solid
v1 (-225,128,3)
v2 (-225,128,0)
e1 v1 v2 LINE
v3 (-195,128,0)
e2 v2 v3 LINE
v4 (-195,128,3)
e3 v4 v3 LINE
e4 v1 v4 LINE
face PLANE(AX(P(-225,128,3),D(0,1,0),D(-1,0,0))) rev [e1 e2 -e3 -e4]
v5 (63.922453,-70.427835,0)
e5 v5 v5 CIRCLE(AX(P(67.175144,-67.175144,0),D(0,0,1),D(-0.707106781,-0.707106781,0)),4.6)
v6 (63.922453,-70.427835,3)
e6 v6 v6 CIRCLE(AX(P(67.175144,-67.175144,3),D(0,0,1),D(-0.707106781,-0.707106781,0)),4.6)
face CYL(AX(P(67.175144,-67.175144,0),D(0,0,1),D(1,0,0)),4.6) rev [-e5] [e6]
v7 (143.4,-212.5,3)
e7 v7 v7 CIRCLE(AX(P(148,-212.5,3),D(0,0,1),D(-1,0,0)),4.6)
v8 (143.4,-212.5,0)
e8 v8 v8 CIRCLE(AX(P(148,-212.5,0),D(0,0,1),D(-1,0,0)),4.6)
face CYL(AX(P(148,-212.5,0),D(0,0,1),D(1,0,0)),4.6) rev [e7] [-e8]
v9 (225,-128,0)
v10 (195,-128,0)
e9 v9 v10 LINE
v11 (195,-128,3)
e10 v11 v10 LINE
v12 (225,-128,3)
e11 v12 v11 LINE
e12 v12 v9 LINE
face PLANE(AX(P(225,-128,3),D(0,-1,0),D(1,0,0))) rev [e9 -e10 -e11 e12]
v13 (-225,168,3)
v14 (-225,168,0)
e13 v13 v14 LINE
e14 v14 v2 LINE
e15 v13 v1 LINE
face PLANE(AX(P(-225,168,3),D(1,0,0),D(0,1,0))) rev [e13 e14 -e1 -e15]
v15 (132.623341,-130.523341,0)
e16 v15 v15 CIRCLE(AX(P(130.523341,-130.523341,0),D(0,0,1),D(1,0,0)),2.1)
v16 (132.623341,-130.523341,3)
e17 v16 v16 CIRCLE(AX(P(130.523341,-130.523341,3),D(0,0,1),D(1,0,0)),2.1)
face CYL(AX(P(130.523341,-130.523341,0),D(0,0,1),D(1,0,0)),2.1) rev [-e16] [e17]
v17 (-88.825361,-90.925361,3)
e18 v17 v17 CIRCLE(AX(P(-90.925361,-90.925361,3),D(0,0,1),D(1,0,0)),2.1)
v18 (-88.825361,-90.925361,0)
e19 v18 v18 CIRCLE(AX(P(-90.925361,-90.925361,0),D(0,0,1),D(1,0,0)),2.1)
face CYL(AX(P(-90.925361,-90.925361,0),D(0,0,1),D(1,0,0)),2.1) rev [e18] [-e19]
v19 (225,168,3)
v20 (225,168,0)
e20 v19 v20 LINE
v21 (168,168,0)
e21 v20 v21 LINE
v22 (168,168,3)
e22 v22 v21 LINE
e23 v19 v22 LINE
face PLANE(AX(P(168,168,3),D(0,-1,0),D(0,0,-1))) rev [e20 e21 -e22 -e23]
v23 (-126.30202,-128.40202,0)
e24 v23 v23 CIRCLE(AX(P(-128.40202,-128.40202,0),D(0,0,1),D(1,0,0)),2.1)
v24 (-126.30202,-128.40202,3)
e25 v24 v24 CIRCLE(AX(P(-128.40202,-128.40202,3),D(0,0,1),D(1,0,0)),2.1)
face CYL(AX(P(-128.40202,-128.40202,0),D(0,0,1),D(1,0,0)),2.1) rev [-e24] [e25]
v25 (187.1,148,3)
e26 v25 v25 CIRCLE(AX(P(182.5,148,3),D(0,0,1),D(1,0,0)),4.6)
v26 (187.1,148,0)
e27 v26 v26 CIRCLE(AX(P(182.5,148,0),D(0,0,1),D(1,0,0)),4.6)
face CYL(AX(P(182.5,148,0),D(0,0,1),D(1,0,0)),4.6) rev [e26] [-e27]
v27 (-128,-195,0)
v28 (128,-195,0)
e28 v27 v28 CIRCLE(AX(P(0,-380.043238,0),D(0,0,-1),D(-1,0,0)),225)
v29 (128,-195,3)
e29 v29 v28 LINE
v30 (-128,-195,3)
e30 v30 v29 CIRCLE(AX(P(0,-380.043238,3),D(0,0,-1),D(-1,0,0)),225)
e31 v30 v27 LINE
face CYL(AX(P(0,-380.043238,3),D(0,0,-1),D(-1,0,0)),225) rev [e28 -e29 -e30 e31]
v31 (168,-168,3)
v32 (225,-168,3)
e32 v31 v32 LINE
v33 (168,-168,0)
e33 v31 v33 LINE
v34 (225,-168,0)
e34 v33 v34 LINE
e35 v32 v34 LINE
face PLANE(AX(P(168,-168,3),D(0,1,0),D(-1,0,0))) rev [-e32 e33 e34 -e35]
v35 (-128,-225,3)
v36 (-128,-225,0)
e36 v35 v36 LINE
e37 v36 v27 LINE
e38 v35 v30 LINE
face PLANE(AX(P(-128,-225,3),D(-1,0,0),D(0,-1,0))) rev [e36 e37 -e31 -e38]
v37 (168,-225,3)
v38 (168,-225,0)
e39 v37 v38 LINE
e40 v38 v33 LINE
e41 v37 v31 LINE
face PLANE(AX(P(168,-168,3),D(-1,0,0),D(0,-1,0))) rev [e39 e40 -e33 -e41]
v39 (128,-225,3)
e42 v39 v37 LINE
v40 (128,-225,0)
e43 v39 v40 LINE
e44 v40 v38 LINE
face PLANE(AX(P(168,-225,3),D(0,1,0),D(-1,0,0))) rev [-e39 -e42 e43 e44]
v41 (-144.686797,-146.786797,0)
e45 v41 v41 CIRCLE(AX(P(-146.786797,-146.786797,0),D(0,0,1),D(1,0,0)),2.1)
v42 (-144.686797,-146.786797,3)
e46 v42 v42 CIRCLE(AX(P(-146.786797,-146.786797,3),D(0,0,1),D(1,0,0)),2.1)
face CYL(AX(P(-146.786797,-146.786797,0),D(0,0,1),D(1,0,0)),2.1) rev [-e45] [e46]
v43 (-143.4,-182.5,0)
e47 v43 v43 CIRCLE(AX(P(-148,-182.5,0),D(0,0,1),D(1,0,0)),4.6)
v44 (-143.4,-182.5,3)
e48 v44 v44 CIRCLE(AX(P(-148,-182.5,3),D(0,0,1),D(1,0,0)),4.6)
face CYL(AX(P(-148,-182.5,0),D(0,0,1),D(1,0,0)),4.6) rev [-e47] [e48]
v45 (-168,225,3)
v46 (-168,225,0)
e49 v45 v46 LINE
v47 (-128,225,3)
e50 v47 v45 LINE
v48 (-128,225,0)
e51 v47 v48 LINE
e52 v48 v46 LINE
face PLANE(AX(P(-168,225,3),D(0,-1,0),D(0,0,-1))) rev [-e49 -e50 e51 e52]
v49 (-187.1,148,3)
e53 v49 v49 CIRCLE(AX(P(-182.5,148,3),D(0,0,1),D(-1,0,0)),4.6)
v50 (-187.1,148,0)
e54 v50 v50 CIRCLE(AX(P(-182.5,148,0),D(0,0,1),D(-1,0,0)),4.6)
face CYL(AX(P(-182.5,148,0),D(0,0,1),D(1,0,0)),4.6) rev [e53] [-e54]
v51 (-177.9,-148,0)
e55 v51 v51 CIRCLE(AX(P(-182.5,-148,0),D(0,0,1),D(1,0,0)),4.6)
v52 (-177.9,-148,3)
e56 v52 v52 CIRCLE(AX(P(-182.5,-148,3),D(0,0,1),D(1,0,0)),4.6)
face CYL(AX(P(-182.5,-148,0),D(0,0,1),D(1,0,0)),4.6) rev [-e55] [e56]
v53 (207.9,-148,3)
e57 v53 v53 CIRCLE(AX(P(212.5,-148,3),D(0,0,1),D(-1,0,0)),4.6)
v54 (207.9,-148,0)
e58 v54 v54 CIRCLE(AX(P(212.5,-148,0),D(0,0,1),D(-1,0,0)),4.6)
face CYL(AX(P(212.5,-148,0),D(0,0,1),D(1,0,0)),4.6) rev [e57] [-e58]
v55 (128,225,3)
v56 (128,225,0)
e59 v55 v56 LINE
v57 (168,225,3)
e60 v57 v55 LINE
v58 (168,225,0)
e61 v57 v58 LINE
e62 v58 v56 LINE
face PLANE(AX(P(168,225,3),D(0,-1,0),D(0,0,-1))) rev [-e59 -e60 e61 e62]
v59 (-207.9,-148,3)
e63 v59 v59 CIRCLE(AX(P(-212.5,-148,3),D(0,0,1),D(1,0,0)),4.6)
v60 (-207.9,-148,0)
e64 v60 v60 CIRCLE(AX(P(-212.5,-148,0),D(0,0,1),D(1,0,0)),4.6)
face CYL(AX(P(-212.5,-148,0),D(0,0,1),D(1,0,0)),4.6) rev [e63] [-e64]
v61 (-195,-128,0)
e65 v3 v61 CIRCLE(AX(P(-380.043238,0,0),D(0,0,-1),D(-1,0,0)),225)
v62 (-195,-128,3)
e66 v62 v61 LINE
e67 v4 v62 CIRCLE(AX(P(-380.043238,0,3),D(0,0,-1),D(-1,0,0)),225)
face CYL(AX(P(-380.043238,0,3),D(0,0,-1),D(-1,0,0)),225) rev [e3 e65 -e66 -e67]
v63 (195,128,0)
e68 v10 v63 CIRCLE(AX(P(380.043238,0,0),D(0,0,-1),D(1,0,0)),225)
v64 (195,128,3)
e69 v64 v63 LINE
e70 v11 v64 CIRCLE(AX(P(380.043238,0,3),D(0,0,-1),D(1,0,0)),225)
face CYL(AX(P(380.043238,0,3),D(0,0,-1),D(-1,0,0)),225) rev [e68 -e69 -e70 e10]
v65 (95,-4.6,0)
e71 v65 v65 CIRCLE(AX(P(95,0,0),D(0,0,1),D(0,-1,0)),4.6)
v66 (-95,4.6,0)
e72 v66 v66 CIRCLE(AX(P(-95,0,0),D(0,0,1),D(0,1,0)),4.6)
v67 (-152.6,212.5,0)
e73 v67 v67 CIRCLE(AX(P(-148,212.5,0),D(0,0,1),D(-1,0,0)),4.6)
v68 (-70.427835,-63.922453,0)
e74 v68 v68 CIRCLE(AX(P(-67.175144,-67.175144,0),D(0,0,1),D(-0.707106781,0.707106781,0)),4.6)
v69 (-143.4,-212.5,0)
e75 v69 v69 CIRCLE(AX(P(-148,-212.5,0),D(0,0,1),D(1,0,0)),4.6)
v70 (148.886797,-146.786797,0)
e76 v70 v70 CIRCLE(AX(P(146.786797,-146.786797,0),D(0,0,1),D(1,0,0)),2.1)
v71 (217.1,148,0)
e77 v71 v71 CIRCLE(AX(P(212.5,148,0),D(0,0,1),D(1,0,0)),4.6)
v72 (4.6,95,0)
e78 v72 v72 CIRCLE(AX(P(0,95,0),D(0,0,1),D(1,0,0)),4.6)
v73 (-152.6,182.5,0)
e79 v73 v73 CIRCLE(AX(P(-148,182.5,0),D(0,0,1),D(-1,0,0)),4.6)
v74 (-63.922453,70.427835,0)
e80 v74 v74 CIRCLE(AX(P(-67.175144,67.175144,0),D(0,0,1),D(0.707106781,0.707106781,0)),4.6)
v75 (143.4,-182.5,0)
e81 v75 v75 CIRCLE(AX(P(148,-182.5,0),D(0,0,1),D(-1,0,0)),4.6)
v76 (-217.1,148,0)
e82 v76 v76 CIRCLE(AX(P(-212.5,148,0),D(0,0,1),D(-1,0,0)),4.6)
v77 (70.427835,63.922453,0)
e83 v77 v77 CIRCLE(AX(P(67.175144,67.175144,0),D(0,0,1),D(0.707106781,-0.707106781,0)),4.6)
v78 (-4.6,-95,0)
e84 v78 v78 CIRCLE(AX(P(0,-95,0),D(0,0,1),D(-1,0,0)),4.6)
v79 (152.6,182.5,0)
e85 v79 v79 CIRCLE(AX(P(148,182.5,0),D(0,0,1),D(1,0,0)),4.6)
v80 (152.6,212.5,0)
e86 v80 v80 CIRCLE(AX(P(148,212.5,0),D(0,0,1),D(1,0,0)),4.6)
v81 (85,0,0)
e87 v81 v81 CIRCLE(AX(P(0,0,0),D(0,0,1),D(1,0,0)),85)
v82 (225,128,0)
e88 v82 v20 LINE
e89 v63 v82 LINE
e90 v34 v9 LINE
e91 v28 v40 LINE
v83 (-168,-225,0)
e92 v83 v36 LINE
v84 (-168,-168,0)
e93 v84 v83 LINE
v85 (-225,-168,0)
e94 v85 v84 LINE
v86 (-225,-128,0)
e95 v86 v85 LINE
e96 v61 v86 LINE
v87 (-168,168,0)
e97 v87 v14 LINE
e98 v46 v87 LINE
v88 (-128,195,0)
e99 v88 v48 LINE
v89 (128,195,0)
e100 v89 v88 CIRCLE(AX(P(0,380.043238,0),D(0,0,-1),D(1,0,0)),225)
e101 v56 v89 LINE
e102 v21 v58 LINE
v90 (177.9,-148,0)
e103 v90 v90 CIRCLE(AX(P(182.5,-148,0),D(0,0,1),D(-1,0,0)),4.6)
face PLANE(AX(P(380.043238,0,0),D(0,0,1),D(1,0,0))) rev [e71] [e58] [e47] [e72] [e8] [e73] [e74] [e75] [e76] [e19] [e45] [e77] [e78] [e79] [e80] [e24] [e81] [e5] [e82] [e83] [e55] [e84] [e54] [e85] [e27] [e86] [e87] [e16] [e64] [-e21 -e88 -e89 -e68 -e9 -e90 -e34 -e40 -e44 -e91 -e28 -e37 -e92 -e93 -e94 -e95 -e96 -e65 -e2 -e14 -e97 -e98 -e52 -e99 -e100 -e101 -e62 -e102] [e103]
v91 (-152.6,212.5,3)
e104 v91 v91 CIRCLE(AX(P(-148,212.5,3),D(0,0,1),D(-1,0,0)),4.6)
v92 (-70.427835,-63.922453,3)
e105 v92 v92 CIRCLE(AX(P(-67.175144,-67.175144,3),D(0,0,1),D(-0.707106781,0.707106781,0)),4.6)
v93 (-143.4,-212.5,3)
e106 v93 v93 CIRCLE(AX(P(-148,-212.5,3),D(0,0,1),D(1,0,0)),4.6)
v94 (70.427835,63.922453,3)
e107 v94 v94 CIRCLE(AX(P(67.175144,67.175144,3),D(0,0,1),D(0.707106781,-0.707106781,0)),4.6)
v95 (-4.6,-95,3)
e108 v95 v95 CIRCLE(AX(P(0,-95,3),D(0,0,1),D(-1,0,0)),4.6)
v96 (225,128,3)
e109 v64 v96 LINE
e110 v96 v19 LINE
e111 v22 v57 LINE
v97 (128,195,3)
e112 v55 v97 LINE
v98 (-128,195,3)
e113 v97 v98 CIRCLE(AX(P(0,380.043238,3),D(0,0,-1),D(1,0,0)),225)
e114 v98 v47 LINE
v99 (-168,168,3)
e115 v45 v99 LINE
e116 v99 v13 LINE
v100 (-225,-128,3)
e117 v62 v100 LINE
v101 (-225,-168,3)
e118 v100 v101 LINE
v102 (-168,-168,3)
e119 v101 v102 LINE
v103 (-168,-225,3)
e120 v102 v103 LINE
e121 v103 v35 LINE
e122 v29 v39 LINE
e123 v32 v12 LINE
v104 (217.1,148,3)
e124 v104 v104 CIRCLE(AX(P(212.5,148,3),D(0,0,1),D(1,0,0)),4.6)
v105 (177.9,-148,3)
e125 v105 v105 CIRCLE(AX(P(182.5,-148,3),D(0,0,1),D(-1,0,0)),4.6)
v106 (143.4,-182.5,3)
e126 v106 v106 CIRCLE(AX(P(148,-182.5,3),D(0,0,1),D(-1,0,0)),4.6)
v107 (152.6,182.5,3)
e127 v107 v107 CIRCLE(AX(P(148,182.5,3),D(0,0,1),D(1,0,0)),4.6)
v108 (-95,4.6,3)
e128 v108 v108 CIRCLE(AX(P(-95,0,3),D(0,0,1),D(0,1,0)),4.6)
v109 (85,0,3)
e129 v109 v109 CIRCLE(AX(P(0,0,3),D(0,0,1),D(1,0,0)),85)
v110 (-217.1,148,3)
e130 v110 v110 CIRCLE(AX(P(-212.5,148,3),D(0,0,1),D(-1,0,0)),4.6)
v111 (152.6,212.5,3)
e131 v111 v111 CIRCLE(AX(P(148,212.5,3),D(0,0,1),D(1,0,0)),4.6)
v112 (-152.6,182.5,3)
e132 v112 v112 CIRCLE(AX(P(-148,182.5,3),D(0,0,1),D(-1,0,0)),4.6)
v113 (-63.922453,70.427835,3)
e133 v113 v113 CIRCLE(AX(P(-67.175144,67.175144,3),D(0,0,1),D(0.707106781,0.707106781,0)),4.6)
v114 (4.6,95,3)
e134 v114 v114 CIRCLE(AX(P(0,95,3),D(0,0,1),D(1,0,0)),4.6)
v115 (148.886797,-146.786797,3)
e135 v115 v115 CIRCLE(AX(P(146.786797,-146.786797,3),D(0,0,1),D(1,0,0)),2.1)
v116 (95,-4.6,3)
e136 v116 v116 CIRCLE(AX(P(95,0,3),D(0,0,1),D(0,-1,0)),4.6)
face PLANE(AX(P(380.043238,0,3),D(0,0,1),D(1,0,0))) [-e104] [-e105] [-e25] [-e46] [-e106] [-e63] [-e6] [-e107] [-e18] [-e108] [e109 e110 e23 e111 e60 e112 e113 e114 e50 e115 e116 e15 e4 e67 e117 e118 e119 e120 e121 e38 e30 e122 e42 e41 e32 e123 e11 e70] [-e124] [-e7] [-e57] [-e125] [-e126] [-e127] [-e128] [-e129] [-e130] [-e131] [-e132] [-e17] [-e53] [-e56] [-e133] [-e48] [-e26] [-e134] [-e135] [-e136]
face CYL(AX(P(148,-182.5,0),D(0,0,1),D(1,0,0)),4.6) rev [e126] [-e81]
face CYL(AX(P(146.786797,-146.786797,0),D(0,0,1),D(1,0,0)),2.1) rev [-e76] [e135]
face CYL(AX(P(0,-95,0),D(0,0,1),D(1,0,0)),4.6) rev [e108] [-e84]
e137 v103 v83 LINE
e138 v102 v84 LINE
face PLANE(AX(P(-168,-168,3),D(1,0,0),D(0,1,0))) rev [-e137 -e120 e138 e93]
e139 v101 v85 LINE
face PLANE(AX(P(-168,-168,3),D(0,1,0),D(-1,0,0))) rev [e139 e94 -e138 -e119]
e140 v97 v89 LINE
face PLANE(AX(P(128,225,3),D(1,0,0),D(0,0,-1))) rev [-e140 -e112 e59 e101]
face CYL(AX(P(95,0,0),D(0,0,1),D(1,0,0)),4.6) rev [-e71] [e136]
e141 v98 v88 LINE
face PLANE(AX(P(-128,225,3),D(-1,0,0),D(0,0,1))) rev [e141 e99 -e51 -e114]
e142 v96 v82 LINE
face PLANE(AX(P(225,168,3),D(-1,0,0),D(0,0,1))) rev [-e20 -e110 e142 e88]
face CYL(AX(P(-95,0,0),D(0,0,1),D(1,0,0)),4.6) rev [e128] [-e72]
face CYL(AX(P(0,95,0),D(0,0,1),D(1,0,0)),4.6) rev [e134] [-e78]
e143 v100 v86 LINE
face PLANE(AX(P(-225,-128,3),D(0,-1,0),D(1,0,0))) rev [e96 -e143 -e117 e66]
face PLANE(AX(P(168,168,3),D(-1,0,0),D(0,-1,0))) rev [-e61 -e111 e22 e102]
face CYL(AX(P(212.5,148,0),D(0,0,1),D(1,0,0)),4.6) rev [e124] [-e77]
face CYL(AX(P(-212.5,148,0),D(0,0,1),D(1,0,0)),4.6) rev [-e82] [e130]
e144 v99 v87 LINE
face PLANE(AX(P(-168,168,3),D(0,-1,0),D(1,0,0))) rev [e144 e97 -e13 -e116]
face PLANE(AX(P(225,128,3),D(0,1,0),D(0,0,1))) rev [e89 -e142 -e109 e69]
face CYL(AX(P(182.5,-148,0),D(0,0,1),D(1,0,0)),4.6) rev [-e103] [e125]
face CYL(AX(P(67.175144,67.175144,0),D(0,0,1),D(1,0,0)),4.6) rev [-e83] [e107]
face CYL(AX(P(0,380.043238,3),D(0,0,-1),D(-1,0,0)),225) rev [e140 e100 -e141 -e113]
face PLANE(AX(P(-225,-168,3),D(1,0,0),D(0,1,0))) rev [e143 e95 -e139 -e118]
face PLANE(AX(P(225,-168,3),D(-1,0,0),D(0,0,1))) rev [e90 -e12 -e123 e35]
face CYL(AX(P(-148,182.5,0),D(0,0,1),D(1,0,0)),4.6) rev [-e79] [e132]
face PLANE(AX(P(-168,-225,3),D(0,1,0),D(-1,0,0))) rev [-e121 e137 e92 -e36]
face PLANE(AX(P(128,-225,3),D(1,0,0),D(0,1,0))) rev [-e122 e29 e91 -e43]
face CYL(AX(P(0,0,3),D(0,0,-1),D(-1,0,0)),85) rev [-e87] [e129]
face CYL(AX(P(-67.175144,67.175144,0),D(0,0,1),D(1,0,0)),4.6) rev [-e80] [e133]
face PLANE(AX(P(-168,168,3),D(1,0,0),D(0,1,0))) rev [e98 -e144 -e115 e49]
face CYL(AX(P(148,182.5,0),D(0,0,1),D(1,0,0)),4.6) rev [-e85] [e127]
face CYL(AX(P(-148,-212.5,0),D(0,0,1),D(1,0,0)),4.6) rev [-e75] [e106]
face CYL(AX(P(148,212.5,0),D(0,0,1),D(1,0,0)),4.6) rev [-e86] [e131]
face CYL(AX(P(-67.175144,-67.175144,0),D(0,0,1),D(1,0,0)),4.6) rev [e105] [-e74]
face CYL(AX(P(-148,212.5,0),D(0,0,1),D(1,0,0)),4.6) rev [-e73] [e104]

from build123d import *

# Parameters (mm, degrees)
SKETCH1_R          = 85
BASE_FLANGE1_DEPTH = 3
SKETCH2_R          = 4.6
EXTRUDE1_DEPTH     = 3
SKETCH3_R          = 4.6
EXTRUDE2_DEPTH     = 3
CIRPATTERN1_COUNT  = 8
SKETCH4_R          = 2.1
CUT_EXTRUDE1_DEPTH = 10


# Sheet-metal steps are written as plain solids
with BuildPart() as part:
    # Sketch1 → Base-Flange1 (new body)
    with BuildSketch(Plane.XY):
        with BuildLine():
            Line((168, 168), (168, 225))
            Line((168, 225), (128, 225))
            Line((128, 225), (128, 195))
            ThreePointArc((128, 195), (0, 155.04323819), (-128, 195))
            Line((-128, 195), (-128, 225))
            Line((-128, 225), (-168, 225))
            Line((-168, 225), (-168, 168))
            Line((-168, 168), (-225, 168))
            Line((-225, 168), (-225, 128))
            Line((-225, 128), (-195, 128))
            ThreePointArc((-195, 128), (-155.04323819, 0), (-195, -128))
            Line((-195, -128), (-225, -128))
            Line((-225, -128), (-225, -168))
            Line((-225, -168), (-168, -168))
            Line((-168, -168), (-168, -225))
            Line((-168, -225), (-128, -225))
            Line((-128, -225), (-128, -195))
            ThreePointArc((-128, -195), (0, -155.04323819), (128, -195))
            Line((128, -195), (128, -225))
            Line((128, -225), (168, -225))
            Line((168, -225), (168, -168))
            Line((168, -168), (225, -168))
            Line((225, -168), (225, -128))
            Line((225, -128), (195, -128))
            ThreePointArc((195, -128), (155.04323819, 0), (195, 128))
            Line((195, 128), (225, 128))
            Line((225, 128), (225, 168))
            Line((225, 168), (168, 168))
        make_face()
        Circle(SKETCH1_R, mode=Mode.SUBTRACT)
    extrude(amount=BASE_FLANGE1_DEPTH)

    # Sketch2 → Extrude1 (cut)
    with BuildSketch(Plane.XY.offset(3)):
        with Locations((148, 212.5)):
            Circle(SKETCH2_R)
        with Locations((148, 182.5)):
            Circle(SKETCH2_R)
        with Locations((182.5, 148)):
            Circle(SKETCH2_R)
        with Locations((212.5, 148)):
            Circle(SKETCH2_R)
        with Locations(Location((212.5, -148, 0), (0, 0, 180))):
            Circle(SKETCH2_R)
        with Locations(Location((182.5, -148, 0), (0, 0, 180))):
            Circle(SKETCH2_R)
        with Locations(Location((148, -182.5, 0), (0, 0, 180))):
            Circle(SKETCH2_R)
        with Locations(Location((148, -212.5, 0), (0, 0, 180))):
            Circle(SKETCH2_R)
        with Locations((-148, -212.5)):
            Circle(SKETCH2_R)
        with Locations((-148, -182.5)):
            Circle(SKETCH2_R)
        with Locations((-182.5, -148)):
            Circle(SKETCH2_R)
        with Locations((-212.5, -148)):
            Circle(SKETCH2_R)
        with Locations(Location((-212.5, 148, 0), (0, 0, 180))):
            Circle(SKETCH2_R)
        with Locations(Location((-182.5, 148, 0), (0, 0, 180))):
            Circle(SKETCH2_R)
        with Locations(Location((-148, 182.5, 0), (0, 0, 180))):
            Circle(SKETCH2_R)
        with Locations(Location((-148, 212.5, 0), (0, 0, 180))):
            Circle(SKETCH2_R)
    extrude(amount=-EXTRUDE1_DEPTH, mode=Mode.SUBTRACT)

    # Sketch3 → Extrude2 (cut)
    with BuildSketch(Plane.XY.offset(3)):
        with Locations((0, 95)):
            Circle(SKETCH3_R)
    extrude2 = extrude(amount=-EXTRUDE2_DEPTH, mode=Mode.SUBTRACT)

    # CirPattern1: Extrude2 ×8 about axis
    cirpattern1_axis = Axis((0, 0, 0), (0, 0, 1))
    for i in range(1, CIRPATTERN1_COUNT):
        add(extrude2.rotate(cirpattern1_axis, i * 360 / CIRPATTERN1_COUNT), mode=Mode.SUBTRACT)

    # Sketch4 → Cut-Extrude1 (cut)
    with BuildSketch(Plane.XY.offset(3)):
        with Locations((-146.786796564, -146.786796564)):
            Circle(SKETCH4_R)
        with Locations((-128.402020254, -128.402020254)):
            Circle(SKETCH4_R)
        with Locations((-90.925360851, -90.925360851)):
            Circle(SKETCH4_R)
        with Locations((130.523340597, -130.523340597)):
            Circle(SKETCH4_R)
        with Locations((146.786796564, -146.786796564)):
            Circle(SKETCH4_R)
    extrude(amount=-CUT_EXTRUDE1_DEPTH, mode=Mode.SUBTRACT)


solid = part.part
